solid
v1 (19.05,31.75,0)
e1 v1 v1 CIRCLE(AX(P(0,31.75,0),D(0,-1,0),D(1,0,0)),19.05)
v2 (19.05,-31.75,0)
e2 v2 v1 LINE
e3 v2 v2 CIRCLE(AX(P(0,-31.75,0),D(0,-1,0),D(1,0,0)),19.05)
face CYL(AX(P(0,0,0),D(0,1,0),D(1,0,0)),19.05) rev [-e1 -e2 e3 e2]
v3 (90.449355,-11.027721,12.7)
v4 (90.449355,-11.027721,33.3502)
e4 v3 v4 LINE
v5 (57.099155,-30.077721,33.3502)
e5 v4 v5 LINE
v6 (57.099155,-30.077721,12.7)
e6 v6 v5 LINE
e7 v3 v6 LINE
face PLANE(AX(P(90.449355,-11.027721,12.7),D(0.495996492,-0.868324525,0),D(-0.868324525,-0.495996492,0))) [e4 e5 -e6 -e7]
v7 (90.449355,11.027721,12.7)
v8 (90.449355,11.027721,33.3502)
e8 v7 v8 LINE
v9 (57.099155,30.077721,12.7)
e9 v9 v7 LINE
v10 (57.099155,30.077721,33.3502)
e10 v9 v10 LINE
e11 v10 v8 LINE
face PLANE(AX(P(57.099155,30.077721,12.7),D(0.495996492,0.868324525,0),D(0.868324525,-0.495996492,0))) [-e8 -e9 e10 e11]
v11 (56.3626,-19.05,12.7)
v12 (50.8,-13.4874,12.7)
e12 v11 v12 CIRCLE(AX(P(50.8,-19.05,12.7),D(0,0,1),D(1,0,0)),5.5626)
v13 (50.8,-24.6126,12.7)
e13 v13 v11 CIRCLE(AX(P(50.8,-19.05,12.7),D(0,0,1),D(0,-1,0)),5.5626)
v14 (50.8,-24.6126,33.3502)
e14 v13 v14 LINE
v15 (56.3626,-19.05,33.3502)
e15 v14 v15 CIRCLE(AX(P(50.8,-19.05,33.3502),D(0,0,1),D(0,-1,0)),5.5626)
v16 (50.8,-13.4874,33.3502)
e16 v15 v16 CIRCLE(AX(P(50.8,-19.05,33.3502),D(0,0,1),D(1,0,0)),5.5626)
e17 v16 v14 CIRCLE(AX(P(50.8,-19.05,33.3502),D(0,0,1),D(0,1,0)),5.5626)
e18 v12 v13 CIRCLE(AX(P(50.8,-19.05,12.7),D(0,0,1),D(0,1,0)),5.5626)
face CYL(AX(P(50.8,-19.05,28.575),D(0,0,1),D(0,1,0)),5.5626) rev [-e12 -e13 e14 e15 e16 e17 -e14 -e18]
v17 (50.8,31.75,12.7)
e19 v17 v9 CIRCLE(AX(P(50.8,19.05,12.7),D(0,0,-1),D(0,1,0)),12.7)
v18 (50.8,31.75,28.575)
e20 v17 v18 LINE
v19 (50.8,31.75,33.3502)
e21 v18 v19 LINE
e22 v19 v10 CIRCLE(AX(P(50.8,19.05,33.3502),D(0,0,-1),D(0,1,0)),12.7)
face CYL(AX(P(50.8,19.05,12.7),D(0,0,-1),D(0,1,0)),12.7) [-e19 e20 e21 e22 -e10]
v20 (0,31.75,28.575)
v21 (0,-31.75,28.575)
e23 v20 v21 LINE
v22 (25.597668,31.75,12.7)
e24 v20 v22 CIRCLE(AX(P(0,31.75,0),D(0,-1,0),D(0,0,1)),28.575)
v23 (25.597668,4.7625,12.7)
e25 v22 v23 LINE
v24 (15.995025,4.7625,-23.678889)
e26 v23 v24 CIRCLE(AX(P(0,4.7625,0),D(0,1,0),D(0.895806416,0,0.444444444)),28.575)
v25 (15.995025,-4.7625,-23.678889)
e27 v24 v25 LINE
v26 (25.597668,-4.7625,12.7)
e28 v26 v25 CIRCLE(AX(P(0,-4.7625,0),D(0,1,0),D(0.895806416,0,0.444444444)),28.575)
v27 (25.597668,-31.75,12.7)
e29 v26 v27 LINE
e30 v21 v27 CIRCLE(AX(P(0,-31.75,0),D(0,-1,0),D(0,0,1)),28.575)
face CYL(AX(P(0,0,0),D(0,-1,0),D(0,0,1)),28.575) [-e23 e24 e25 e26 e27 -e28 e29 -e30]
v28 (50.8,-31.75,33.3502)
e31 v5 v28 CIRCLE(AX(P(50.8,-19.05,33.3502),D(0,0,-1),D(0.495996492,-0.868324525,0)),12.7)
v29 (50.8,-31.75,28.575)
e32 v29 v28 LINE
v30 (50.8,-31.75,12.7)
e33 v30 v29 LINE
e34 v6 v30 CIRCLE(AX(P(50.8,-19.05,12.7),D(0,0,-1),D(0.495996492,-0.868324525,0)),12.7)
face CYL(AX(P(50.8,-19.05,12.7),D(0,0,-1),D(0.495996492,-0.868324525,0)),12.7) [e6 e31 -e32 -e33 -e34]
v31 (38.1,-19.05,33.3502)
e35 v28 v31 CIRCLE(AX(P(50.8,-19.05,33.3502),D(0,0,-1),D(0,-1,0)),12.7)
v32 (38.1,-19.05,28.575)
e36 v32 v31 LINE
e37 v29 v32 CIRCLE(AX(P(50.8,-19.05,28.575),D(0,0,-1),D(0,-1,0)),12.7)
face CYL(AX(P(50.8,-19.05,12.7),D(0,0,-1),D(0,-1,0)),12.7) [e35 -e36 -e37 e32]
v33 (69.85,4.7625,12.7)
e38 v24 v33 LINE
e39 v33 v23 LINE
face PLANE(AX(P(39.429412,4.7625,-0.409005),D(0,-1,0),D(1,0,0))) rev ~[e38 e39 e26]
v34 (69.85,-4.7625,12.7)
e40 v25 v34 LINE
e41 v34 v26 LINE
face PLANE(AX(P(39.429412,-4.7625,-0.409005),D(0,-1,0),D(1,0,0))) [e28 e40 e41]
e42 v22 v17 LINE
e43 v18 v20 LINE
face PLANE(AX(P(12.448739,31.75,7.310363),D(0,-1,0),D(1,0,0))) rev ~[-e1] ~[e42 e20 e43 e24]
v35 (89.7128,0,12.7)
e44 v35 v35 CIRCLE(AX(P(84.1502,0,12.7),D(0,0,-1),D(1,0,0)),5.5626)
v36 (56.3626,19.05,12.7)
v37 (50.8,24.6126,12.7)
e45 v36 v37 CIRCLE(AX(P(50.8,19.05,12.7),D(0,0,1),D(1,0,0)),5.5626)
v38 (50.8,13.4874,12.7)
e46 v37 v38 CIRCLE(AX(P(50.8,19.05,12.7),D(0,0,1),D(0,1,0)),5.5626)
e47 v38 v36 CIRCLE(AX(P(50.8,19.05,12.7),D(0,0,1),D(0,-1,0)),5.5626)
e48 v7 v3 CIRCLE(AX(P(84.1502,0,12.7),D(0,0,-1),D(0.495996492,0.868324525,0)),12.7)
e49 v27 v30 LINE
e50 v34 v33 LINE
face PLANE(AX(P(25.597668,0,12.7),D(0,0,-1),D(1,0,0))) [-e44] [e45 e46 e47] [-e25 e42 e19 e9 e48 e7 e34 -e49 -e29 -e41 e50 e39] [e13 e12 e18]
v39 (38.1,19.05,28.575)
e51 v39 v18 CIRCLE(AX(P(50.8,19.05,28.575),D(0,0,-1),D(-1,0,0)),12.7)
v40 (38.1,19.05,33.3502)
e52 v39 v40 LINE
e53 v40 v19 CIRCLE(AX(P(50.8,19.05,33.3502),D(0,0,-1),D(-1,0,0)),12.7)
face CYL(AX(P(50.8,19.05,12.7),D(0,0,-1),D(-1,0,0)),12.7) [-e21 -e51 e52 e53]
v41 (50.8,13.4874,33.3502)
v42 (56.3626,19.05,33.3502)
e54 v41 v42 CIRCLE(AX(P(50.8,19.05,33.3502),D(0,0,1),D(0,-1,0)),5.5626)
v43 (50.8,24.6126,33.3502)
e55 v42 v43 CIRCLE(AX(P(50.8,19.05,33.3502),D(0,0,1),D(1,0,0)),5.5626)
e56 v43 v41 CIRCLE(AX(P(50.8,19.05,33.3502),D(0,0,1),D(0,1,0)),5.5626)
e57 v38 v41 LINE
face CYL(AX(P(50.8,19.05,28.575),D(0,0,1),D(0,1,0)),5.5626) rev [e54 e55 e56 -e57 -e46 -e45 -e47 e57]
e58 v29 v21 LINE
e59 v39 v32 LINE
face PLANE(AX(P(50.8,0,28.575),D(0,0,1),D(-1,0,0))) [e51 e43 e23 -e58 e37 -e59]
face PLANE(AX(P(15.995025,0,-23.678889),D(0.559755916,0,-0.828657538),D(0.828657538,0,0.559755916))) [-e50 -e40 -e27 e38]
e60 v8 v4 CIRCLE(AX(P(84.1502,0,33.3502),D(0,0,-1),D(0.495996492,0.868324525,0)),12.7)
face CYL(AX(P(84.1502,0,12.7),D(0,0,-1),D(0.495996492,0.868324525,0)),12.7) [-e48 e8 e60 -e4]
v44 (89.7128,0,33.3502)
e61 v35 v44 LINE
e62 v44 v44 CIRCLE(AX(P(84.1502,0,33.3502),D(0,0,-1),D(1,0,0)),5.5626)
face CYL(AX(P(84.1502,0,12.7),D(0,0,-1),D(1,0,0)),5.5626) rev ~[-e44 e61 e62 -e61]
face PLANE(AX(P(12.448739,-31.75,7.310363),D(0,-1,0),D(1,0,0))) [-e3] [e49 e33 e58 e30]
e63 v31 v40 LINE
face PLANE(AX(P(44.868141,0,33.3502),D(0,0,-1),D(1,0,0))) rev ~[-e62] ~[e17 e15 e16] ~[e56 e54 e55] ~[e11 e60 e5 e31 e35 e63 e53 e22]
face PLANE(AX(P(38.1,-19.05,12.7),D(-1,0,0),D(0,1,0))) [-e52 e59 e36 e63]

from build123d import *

# Parameters (mm, degrees)
F0_R     = 19.05
F1_DEPTH = 31.75
F2_R     = 5.5626
F3_DEPTH = 20.6502
F4_DEPTH = 57.151
F6_DEPTH = 4.7625


with BuildPart() as f1:
    # F0 (on Front) → F1 (new body, symmetric)
    with BuildSketch(Plane.XZ):
        with BuildLine():
            Line((50.8, 28.575), (0, 28.575))
            ThreePointArc((0, 28.575), (-15.0603473566, -24.2840804335), (25.5976683508, 12.7))
            Line((25.5976683508, 12.7), (50.8, 12.7))
            Line((50.8, 12.7), (50.8, 28.575))
        make_face()
        Circle(F0_R, mode=Mode.SUBTRACT)
    extrude(amount=F1_DEPTH, both=True)

    # F2 (on face) → F3 (join)
    with BuildSketch(Plane(origin=(0, 0, 12.7), x_dir=(1, 0, 0), z_dir=(0, 0, -1))):
        with BuildLine():
            Line((50.8, 24.6126), (50.8, 31.75))
            ThreePointArc((50.8, 31.75), (41.8197438789, 28.0302561211), (38.1, 19.05))
            Line((38.1, 19.05), (38.1, -19.05))
            ThreePointArc((38.1, -19.05), (41.8197438789, -28.0302561211), (50.8, -31.75))
            Line((50.8, -31.75), (50.8, -24.6126))
            ThreePointArc((50.8, -24.6126), (45.2374, -19.05), (50.8, -13.4874))
            Line((50.8, -13.4874), (50.8, 13.4874))
            ThreePointArc((50.8, 13.4874), (45.2374, 19.05), (50.8, 24.6126))
        make_face()
        with BuildLine():
            Line((90.4493554441, 11.0277214642), (57.0991554441, 30.0777214642))
            ThreePointArc((57.0991554441, 30.0777214642), (54.0586759125, 31.3248128824), (50.8, 31.75))
            Line((50.8, 31.75), (50.8, 24.6126))
            ThreePointArc((50.8, 24.6126), (54.733352181, 22.983352181), (56.3626, 19.05))
            ThreePointArc((56.3626, 19.05), (54.733352181, 15.116647819), (50.8, 13.4874))
            Line((50.8, 13.4874), (50.8, -13.4874))
            ThreePointArc((50.8, -13.4874), (54.733352181, -15.116647819), (56.3626, -19.05))
            ThreePointArc((56.3626, -19.05), (54.733352181, -22.983352181), (50.8, -24.6126))
            Line((50.8, -24.6126), (50.8, -31.75))
            ThreePointArc((50.8, -31.75), (54.0586759125, -31.3248128824), (57.0991554441, -30.0777214642))
            Line((57.0991554441, -30.0777214642), (90.4493554441, -11.0277214642))
            ThreePointArc((90.4493554441, -11.0277214642), (96.8502, 0), (90.4493554441, 11.0277214642))
        make_face()
        with Locations((84.1502, 0)):
            Circle(F2_R, mode=Mode.SUBTRACT)
    extrude(amount=-F3_DEPTH)

    # F4 (cut, through all): faces of the model
    f4_faces = [f1.faces().sort_by_distance(p)[0] for p in [
        (48.4391592362, 19.05, 28.575),
        (48.4391592362, -19.05, 28.575),
    ]]
    extrude(f4_faces, amount=-F4_DEPTH, mode=Mode.SUBTRACT)

    # F5 (on Front) → F6 (join, symmetric)
    with BuildSketch(Plane.XZ):
        with BuildLine():
            ThreePointArc((25.5976683508, 12.7), (27.6286795727, -7.2929205446), (15.9950252975, -23.6788891364))
            Line((15.9950252975, -23.6788891364), (69.85, 12.7))
            Line((69.85, 12.7), (25.5976683508, 12.7))
        make_face()
    extrude(amount=F6_DEPTH, both=True)


solid = f1.part
